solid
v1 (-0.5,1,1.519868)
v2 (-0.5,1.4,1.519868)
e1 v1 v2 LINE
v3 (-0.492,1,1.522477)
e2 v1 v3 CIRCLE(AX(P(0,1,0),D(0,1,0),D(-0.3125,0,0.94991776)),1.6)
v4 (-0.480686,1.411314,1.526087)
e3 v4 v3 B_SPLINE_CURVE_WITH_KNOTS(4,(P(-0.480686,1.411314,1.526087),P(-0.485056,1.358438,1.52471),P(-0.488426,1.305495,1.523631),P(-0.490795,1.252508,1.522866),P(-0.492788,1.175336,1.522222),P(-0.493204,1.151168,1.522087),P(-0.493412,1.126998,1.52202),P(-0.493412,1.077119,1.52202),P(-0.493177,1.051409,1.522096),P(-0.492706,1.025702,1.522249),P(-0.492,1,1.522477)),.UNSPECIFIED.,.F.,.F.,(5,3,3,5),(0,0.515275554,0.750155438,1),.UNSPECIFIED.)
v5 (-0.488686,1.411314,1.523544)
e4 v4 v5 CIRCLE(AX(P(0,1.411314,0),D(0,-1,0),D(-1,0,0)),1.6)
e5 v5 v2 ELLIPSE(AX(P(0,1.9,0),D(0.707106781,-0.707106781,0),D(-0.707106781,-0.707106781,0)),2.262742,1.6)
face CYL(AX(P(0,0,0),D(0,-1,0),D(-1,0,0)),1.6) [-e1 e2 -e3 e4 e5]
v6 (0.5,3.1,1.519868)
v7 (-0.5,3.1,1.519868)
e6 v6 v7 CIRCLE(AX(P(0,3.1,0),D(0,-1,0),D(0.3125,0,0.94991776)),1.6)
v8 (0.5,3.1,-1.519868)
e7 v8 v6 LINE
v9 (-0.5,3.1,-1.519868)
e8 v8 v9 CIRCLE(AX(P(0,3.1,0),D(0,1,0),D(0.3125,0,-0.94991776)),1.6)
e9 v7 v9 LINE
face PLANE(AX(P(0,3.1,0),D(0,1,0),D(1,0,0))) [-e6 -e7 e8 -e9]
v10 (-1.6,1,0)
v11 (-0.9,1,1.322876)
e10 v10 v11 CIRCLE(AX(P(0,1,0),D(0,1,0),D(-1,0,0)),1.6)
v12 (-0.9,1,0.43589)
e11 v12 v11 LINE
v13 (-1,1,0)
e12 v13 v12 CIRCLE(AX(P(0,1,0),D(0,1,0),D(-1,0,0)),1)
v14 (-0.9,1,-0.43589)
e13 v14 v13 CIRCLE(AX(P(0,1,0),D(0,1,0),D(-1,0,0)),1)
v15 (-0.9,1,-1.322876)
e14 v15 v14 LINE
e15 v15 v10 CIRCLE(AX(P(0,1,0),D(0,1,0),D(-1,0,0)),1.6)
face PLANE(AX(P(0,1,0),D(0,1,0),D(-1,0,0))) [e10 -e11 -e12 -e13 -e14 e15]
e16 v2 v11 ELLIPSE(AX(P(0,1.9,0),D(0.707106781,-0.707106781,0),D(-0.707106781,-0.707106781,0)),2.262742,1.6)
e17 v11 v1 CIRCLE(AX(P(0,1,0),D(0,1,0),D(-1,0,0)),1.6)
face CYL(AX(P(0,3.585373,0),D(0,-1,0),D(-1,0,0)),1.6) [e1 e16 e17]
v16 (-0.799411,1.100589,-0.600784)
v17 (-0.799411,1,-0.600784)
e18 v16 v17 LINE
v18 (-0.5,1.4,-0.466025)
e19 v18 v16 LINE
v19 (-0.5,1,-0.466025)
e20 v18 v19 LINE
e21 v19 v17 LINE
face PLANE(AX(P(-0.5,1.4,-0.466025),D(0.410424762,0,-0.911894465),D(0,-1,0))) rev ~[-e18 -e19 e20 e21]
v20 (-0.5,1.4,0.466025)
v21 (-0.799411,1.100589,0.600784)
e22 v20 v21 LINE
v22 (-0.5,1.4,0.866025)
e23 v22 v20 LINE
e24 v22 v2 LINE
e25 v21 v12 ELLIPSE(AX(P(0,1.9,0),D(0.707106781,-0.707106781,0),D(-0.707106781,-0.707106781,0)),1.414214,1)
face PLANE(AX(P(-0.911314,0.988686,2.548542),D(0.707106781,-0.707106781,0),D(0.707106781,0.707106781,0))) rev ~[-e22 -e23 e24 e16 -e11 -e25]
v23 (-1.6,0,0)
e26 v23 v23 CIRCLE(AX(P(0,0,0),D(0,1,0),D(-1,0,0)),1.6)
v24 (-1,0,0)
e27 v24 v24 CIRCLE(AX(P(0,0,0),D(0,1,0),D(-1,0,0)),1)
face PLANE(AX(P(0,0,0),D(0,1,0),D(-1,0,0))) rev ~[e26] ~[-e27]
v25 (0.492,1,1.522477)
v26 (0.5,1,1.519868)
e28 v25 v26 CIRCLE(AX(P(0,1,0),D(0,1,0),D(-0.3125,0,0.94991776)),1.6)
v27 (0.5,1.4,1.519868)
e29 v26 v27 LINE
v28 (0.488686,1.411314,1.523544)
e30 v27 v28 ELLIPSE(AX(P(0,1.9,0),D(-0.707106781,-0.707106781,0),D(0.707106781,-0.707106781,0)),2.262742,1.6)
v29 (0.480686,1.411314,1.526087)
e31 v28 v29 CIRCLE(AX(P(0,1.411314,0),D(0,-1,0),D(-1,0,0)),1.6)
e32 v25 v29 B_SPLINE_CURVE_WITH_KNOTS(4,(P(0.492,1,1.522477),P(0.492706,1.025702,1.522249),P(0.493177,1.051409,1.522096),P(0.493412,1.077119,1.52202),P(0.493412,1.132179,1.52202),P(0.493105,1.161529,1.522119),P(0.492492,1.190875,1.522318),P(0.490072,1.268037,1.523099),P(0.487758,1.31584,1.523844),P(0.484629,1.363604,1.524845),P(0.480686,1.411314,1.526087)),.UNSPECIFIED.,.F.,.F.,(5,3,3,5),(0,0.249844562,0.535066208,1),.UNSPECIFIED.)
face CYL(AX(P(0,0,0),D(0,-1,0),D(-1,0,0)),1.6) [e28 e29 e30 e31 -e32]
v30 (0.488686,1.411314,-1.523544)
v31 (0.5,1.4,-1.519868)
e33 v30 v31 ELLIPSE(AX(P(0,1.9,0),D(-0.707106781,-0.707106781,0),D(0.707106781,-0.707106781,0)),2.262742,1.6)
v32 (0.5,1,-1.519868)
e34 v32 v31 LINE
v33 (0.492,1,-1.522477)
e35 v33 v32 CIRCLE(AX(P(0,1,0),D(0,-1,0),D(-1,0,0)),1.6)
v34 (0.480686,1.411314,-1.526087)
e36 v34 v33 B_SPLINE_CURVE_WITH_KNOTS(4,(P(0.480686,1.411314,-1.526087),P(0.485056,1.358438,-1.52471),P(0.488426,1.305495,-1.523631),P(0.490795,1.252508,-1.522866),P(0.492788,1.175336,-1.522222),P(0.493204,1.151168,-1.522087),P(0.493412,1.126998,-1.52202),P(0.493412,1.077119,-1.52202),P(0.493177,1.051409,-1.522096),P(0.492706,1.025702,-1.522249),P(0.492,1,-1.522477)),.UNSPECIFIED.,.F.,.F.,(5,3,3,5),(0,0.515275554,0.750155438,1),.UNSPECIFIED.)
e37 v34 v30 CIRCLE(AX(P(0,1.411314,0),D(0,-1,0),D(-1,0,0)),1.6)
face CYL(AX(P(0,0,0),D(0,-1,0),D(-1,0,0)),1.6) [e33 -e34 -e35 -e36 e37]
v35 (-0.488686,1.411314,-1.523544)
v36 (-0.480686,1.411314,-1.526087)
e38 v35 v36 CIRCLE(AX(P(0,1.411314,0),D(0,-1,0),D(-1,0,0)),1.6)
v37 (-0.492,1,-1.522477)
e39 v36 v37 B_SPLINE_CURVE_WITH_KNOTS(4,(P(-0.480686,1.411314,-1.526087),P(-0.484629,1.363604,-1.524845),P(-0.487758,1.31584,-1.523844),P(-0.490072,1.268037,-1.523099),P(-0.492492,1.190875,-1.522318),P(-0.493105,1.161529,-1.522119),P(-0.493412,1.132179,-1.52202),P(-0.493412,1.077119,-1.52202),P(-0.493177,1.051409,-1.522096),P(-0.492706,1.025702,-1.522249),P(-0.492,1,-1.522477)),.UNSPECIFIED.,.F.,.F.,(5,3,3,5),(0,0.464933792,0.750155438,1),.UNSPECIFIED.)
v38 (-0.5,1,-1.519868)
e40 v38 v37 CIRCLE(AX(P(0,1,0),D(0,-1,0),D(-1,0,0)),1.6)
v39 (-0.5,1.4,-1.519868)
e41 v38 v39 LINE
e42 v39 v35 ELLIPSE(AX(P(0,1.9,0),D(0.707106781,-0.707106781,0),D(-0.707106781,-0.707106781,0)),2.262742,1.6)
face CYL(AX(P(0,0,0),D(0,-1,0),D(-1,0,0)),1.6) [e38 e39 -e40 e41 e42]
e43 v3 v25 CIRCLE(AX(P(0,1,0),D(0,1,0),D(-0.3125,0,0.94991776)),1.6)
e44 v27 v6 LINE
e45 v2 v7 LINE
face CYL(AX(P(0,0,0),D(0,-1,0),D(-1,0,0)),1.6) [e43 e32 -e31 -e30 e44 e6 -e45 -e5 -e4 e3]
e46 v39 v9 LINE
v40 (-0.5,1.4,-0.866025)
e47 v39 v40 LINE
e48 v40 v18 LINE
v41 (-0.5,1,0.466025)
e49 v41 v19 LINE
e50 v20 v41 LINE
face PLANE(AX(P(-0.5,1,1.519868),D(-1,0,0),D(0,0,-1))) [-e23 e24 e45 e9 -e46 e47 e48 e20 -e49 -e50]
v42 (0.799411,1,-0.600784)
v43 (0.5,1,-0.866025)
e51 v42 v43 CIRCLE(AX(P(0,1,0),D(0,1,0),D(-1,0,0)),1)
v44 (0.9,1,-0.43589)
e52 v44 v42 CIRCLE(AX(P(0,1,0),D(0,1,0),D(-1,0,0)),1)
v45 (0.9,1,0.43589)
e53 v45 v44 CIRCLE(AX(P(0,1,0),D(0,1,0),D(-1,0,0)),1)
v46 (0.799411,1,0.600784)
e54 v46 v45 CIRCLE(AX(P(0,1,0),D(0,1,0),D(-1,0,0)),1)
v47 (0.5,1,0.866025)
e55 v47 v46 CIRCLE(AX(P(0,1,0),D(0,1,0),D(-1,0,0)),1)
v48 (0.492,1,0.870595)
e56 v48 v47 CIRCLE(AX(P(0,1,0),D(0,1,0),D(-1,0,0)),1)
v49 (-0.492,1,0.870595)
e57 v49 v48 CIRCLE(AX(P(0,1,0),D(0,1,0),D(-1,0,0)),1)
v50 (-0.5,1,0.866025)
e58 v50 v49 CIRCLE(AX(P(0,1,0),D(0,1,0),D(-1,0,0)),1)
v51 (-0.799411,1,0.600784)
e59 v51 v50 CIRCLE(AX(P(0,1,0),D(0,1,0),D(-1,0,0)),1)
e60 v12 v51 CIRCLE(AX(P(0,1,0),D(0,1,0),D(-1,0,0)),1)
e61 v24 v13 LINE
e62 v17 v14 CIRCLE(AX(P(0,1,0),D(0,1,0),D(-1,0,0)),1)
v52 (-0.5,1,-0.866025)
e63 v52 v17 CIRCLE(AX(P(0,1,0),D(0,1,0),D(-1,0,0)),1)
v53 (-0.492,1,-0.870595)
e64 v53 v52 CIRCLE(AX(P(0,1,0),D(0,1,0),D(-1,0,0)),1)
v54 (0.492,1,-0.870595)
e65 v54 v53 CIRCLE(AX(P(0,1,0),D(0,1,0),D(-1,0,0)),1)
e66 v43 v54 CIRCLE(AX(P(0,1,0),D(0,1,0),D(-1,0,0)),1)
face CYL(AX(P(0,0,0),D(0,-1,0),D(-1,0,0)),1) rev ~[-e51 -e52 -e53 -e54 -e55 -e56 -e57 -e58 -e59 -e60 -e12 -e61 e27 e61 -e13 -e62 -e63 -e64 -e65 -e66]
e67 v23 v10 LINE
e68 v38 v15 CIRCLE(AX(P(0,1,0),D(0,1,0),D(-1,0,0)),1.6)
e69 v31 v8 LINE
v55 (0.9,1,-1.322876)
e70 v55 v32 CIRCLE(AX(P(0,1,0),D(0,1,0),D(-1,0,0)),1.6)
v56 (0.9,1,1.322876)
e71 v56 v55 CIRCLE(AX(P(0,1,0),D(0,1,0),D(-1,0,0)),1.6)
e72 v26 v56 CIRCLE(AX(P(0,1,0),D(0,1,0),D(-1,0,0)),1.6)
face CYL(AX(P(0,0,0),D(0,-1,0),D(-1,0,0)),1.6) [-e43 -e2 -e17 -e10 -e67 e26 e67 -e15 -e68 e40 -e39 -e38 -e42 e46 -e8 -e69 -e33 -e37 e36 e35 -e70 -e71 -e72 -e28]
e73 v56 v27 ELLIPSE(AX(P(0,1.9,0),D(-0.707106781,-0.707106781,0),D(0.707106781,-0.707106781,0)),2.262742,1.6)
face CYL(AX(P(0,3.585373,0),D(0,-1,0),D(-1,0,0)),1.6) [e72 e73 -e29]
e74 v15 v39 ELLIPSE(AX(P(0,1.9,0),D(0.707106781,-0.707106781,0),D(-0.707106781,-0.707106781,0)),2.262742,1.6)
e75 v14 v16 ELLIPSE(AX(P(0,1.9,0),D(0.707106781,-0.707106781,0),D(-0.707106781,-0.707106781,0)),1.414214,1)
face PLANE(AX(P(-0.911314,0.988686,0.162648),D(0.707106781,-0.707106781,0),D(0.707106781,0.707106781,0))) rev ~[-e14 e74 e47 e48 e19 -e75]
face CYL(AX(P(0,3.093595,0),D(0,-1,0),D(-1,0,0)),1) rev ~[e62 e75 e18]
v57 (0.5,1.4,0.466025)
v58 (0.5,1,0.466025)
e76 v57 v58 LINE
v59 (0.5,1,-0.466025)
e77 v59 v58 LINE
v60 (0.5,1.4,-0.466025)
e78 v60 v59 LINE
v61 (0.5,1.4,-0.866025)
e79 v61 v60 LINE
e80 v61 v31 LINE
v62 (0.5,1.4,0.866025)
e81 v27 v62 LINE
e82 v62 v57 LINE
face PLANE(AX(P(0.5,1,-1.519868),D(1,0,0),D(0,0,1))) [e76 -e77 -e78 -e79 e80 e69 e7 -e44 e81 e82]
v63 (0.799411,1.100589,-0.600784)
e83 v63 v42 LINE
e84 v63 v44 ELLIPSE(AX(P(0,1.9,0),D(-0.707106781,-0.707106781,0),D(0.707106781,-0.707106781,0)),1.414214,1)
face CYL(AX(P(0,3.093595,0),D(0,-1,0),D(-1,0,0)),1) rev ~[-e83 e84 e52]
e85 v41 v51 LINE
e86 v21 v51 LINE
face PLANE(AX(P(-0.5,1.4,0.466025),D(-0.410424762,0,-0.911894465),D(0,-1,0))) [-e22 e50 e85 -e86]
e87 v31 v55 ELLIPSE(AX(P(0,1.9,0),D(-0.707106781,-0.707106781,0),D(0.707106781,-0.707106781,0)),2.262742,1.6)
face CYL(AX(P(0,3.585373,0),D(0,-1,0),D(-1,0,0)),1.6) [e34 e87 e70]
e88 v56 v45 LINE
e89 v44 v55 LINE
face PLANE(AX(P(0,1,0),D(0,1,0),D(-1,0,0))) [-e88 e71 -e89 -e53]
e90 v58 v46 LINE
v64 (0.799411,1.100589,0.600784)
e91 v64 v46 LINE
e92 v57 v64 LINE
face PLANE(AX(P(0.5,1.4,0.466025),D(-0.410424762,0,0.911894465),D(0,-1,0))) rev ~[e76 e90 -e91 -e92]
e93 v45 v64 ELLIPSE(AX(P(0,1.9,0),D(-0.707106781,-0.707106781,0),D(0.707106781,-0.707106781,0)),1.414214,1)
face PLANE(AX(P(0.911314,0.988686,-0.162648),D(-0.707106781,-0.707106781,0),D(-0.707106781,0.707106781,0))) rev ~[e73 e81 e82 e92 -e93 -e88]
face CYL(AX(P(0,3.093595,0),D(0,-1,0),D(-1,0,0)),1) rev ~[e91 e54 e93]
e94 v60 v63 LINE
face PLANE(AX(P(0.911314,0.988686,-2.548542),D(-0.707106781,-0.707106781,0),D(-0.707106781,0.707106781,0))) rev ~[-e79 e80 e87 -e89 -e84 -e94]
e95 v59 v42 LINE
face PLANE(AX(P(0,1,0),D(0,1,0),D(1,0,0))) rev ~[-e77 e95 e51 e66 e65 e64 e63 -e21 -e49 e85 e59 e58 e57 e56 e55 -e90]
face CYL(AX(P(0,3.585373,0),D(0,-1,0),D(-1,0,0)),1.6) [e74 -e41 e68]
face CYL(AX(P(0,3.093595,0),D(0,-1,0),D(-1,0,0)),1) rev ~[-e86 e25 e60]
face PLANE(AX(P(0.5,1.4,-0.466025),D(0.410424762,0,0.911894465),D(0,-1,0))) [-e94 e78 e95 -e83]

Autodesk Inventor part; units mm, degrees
ref_plane "YZ Plane" through (0, 0, 0) normal (1, 0, 0) x (0, 1, 0)
ref_plane "XZ Plane" through (0, 0, 0) normal (0, 1, 0) x (-1, 0, 0)
ref_plane "XY Plane" through (0, 0, 0) normal (0, 0, 1) x (1, 0, 0)
sketch "스케치2" plane through (0, 0, 0) normal (0, 1, 0) x (-1, 0, 0)
  circle A0 centre (0, 0) radius 1.6
  circle A1 centre (0, 0) radius 1
  dimension "d0" = 3.2
  dimension "d6" = 2
extrude "돌출1" add sketch "스케치2" along normal blind 1
sketch "스케치4" plane through (0, 1, 0) normal (0, 1, 0) x (1, 0, 0)
  line L0 (0.5, -1.55) -> (-0.5, -1.55)
  line L1 (-0.5, -1.55) -> (-0.5, 1.55)
  line L2 (-0.5, 1.55) -> (0.5, 1.55)
  line L3 (0.5, 1.55) -> (0.5, -1.55)
  line L4 (0.5, -1.55) -> (-0.5, 1.55) construction
  line L5 (-0.5, -1.55) -> (0.5, 1.55) construction
  circle A0 centre (0, 0) radius 1.6 projected
  point P0 (0.5, 1.5199)
  point P1 (-0.5, 1.5199)
  point P2 (-0.5, -1.5199)
  point P3 (0.5, -1.5199)
  dimension "d7" = 1
extrude "돌출3" add sketch "스케치4" along normal blind 2.1 contours A0 L0 | L0 A0 L1 L2 L3 | L2 A0
chamfer "모따기1" distance 0.4 angle 45 4 edges at (0.5, 1, 1.1929) (0.5, 1, -1.1929) (-0.5, 1, -1.1929) (-0.5, 1, 1.1929)
chamfer "모따기2" distance 0.4 angle 45 4 edges at (-0.5, 1.2, -0.866) (-0.5, 1.2, 0.866) (0.5, 1.2, 0.866) (0.5, 1.2, -0.866)
properties part number "bone_attachment_3.2mm_test"
